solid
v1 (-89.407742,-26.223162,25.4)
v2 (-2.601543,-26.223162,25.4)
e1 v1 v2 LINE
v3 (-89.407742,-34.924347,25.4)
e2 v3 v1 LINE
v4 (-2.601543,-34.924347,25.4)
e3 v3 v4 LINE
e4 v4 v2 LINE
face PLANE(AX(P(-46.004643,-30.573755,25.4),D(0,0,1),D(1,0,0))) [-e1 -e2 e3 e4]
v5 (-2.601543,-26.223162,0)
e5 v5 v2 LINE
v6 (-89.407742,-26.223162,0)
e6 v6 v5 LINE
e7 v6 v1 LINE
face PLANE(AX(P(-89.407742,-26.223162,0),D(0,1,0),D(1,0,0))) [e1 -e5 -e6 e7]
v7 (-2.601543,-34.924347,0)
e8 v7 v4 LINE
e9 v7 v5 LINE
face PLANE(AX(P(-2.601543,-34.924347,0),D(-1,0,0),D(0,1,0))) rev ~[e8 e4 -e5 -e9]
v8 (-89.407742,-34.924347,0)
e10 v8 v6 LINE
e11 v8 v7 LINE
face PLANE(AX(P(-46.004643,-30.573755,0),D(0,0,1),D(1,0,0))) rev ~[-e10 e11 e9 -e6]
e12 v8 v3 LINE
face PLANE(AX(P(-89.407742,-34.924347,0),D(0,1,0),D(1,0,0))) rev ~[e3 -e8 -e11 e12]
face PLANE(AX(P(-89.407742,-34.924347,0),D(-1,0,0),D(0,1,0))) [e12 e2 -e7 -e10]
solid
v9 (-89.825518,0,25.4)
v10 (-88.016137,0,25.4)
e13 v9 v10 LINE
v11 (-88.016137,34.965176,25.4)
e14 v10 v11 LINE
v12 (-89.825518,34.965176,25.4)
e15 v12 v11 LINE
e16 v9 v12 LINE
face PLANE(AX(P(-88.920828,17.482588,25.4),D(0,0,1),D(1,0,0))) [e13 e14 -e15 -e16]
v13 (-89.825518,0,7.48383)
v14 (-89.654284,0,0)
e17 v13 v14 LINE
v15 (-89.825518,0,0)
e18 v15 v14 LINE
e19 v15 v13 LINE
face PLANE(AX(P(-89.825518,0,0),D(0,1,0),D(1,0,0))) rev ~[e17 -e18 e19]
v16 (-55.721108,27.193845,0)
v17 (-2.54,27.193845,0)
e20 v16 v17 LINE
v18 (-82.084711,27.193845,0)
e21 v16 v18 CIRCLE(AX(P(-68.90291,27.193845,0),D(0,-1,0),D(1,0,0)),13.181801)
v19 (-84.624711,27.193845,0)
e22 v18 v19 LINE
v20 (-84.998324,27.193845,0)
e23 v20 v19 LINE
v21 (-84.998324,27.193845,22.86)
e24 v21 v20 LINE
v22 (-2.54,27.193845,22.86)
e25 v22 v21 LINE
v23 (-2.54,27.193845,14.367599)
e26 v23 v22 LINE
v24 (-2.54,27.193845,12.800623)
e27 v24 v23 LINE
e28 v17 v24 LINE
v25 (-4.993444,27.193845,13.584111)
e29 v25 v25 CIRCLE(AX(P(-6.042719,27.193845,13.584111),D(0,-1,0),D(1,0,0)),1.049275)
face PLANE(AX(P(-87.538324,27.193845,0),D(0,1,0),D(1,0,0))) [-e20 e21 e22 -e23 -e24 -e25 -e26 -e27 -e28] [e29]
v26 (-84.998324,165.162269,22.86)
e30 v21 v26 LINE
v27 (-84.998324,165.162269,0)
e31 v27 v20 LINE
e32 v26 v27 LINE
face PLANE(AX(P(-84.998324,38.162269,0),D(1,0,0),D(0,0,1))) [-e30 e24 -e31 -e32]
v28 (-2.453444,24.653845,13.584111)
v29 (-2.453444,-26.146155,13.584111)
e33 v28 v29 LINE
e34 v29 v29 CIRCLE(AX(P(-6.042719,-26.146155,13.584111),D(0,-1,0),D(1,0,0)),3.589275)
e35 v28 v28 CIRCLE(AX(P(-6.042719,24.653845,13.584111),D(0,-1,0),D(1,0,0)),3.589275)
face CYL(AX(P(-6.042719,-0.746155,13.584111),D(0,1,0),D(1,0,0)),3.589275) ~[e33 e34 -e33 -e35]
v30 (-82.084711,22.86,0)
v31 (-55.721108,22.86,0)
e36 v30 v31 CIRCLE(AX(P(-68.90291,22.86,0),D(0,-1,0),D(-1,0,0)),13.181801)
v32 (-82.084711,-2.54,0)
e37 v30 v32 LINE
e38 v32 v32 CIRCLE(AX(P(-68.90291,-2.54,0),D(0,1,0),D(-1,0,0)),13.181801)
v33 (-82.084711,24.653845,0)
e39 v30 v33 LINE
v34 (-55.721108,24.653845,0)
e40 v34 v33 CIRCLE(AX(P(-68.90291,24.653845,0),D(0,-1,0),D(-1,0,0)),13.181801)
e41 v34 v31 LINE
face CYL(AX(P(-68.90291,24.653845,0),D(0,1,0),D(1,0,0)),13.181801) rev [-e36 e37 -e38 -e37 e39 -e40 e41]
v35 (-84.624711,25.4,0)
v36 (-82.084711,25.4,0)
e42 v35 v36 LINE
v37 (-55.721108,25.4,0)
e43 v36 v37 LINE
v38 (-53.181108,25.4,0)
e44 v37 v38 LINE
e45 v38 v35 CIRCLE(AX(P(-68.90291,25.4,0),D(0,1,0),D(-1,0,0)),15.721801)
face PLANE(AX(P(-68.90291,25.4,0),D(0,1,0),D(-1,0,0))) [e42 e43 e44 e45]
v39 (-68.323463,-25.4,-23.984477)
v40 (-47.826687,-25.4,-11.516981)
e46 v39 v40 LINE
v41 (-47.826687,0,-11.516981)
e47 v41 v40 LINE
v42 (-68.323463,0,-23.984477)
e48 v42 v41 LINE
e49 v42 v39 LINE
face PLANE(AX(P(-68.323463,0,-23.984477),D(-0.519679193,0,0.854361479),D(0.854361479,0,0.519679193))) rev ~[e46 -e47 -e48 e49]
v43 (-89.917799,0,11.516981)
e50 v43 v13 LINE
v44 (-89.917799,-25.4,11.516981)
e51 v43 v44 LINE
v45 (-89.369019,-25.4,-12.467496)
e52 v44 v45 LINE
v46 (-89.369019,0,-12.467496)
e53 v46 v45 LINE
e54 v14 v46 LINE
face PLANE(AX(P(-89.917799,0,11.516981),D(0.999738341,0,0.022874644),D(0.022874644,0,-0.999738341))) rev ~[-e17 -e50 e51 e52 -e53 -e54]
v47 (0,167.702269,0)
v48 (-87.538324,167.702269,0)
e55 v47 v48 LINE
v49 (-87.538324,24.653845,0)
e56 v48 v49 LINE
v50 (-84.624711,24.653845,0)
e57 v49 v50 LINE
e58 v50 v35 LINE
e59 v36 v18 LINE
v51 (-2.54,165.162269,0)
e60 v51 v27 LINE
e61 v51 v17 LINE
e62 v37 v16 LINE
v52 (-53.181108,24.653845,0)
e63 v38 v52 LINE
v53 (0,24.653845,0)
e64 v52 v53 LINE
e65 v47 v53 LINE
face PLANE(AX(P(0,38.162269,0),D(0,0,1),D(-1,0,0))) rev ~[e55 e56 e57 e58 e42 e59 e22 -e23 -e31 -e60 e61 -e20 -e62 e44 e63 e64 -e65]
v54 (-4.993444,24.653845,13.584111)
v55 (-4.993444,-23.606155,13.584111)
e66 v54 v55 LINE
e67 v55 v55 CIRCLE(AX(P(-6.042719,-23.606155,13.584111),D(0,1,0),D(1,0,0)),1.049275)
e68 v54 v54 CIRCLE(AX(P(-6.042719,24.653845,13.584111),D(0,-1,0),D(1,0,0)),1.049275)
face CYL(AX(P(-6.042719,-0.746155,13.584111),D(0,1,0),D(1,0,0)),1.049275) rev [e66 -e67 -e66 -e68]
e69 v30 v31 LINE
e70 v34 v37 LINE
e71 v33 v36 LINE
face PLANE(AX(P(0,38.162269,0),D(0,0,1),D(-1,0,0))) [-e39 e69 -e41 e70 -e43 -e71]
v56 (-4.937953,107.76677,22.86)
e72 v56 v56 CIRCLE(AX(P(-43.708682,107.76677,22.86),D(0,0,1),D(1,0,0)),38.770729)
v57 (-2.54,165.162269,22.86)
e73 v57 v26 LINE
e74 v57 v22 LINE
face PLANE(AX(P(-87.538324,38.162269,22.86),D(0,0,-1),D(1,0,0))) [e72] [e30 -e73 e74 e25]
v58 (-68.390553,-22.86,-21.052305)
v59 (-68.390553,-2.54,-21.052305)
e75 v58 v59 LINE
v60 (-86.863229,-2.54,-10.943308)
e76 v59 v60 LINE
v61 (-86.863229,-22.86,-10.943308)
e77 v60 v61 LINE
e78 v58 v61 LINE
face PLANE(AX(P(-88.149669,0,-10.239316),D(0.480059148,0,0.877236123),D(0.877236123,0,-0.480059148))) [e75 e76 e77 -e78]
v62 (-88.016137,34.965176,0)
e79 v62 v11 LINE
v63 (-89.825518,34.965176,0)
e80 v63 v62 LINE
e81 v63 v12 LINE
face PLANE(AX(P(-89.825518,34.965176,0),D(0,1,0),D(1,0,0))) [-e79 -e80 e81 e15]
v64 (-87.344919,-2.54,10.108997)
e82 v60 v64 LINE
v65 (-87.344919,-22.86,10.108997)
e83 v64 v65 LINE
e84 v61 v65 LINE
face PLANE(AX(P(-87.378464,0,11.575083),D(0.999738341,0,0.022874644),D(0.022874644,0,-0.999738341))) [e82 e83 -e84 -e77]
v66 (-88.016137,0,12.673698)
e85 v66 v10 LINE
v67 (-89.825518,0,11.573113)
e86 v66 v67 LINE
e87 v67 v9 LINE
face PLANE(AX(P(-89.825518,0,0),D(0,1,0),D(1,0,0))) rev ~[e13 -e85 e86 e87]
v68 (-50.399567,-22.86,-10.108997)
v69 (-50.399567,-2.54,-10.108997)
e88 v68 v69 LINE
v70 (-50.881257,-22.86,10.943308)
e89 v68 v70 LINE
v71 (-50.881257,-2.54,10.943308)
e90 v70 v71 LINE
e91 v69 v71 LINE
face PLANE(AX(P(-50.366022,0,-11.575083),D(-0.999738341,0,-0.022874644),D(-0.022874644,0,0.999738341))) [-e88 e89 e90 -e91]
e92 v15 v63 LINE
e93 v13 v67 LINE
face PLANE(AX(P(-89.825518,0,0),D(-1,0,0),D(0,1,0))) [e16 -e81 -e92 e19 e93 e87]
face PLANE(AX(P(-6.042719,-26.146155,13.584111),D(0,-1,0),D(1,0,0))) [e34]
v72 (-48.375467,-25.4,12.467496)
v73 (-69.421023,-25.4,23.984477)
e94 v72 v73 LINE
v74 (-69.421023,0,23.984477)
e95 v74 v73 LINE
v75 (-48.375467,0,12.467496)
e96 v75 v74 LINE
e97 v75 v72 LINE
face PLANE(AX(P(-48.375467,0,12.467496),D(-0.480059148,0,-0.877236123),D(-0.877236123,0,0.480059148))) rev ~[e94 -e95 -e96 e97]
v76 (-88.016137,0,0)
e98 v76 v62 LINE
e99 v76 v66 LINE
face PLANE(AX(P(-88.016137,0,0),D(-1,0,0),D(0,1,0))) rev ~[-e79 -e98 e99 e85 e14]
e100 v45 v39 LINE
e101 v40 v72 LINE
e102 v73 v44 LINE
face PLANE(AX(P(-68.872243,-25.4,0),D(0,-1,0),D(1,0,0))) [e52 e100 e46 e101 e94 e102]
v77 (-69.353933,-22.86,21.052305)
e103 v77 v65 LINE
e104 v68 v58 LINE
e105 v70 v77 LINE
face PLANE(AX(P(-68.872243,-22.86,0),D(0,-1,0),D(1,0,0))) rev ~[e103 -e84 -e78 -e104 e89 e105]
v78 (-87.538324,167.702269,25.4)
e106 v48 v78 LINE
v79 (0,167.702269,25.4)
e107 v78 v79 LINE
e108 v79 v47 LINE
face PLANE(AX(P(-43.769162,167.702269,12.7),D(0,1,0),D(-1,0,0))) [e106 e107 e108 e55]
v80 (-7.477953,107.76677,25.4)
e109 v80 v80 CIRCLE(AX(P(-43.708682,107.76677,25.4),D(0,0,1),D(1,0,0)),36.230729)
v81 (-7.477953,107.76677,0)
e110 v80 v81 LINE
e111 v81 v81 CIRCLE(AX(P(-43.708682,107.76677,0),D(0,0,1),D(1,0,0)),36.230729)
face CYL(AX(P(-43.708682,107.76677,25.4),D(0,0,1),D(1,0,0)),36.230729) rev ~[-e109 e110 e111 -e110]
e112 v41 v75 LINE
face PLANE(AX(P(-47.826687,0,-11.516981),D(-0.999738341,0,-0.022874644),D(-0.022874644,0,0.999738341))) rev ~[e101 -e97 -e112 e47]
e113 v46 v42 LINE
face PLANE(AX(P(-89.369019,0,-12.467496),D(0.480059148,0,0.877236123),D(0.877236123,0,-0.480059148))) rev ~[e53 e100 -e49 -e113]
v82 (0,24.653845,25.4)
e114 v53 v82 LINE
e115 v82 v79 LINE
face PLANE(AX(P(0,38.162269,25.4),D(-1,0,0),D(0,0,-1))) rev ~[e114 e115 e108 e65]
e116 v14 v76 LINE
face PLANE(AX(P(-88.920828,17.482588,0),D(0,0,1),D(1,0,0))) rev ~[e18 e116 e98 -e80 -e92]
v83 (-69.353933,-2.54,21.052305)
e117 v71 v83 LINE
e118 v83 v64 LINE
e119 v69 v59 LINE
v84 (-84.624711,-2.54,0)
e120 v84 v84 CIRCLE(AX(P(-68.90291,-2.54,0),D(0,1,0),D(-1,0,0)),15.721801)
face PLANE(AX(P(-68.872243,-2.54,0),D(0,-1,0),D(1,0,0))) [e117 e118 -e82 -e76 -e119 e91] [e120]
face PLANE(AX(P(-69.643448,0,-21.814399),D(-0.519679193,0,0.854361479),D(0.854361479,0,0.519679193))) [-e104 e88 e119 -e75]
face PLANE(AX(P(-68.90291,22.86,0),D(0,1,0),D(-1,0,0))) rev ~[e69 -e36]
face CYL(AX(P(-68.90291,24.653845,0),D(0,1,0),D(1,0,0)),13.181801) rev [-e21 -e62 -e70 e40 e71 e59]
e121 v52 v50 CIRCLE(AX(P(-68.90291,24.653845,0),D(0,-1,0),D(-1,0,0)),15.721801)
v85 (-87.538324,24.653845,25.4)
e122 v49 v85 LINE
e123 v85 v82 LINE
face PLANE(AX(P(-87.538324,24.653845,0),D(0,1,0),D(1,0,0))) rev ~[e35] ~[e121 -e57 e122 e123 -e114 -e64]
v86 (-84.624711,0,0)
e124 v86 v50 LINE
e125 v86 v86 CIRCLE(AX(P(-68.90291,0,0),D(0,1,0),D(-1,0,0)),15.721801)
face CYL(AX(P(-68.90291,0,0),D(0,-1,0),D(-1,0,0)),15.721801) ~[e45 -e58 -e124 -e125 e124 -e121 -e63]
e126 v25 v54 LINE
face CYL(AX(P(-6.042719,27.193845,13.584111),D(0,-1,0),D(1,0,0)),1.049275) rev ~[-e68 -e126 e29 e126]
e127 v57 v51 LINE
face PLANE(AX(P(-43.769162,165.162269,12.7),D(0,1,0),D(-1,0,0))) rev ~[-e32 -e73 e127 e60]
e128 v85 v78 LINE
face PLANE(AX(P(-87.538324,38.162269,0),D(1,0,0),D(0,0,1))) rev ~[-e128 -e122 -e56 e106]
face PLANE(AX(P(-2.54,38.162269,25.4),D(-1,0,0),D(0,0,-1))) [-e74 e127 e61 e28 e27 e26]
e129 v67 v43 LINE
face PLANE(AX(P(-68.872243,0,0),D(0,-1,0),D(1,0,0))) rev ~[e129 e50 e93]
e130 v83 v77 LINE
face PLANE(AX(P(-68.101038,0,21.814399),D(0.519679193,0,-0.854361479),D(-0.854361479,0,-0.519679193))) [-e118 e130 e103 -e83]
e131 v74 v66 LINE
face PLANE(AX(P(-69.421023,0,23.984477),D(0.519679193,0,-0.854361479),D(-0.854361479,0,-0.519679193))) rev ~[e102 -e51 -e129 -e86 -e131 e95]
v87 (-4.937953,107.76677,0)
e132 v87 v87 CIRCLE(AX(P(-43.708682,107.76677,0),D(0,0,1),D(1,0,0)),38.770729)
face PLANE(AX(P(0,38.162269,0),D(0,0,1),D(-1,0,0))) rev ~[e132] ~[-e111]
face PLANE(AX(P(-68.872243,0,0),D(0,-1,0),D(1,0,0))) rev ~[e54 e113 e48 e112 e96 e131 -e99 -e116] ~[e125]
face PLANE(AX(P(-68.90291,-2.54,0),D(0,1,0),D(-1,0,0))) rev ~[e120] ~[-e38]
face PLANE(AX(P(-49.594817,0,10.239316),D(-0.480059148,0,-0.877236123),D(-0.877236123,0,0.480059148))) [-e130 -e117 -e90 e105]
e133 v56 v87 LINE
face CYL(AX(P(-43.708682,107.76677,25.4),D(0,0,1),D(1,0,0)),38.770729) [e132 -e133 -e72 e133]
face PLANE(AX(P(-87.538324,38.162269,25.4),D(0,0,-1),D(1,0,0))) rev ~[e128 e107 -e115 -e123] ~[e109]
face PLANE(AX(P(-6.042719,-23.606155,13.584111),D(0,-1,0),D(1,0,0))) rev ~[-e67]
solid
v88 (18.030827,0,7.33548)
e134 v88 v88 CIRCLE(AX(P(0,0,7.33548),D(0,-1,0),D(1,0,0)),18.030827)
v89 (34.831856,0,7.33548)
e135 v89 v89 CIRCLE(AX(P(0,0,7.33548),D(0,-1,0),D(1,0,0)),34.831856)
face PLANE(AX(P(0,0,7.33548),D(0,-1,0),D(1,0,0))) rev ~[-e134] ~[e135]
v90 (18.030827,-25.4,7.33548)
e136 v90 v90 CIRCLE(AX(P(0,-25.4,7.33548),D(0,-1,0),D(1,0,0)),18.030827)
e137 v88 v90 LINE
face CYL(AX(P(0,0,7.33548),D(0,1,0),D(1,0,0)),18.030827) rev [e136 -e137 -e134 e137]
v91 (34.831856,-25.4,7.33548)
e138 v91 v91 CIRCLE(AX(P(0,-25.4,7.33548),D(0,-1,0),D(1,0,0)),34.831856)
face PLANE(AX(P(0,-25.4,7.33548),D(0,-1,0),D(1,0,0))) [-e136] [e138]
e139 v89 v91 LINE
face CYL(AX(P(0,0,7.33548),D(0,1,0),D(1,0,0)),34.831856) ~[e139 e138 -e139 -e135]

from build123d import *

# Parameters (mm, degrees)
F1_DEPTH     = 25.4
F2_R         = 25.8999671589
F2_R_2       = 17.2023355416
F3_DEPTH     = 25.4
F4_R         = 34.8318560705
F4_R_2       = 18.0308272553
F5_DEPTH     = 25.4
F6_R         = 14.9551436637
F7_DEPTH     = 25.4
F8_R         = 15.7218012702
F9_DEPTH     = 25.4
F10_W        = 87.5383242965
F10_H        = 13.5084241629
F11_DEPTH    = 25.4
F12_R        = 3.589274675
F13_DEPTH    = 25.4
F15_DEPTH    = 129.54
F16_DEPTH    = 25.4
F17_W        = 86.8061985821
F17_H        = 8.7011847645
F18_DEPTH    = 25.4
F19_R        = 36.2307294495
F20_DEPTH    = 25.4
F21_T        = 2.54
F21_T6_ANGLE = 180.000000001
F22_W        = 1.8093809485
F22_H        = 34.9651761353
F23_DEPTH    = 25.4


# Not quite as in the source:
# - a shell that OpenCascade refuses in one call is made with other operations: the cavity is built on its own and cut out


with BuildPart() as f1:
    # F0 (on Front) → F1 (new body)
    with BuildSketch(Plane.XZ):
        Polygon((-48.3754668356, 12.4674958523), (-69.4210231304, 23.9844769239), (-89.9177994608, 11.5169810717), (-89.3690194964, -12.4674958523), (-68.3234632015, -23.9844769239), (-47.8266868711, -11.5169810717), align=None)
    extrude(amount=F1_DEPTH)

    # F2 (on Front) → F3 (cut)
    with BuildSketch(Plane.XZ):
        Circle(F2_R)
        Circle(F2_R_2, mode=Mode.SUBTRACT)
        Circle(F2_R_2)
    extrude(amount=-F3_DEPTH, mode=Mode.SUBTRACT)

    # F6 (on Front) → F7 (join)
    with BuildSketch(Plane.XZ):
        with Locations((-68.4596300125, 0)):
            Circle(F6_R)
    extrude(amount=F7_DEPTH)

    # F8 (on face) → F9 (join)
    with BuildSketch(Plane(origin=(0, 0, 0), x_dir=(-1, 0, 0), z_dir=(0, 1, 0))):
        with Locations((68.9029097557, 0)):
            Circle(F8_R)
    extrude(amount=F9_DEPTH)

    # F10 (on Top) → F11 (join)
    with BuildSketch(Plane.XY):
        with Locations((-43.7691621482, 31.4080566168)):
            Rectangle(F10_W, F10_H)
    extrude(amount=F11_DEPTH)

    # F12 (on face) → F13 (join)
    with BuildSketch(Plane.XZ.offset(-24.6538445354)):
        with Locations((-6.0427188873, 13.5841108859)):
            Circle(F12_R)
    extrude(amount=F13_DEPTH)

    # F14 (on face) → F15 (join)
    with BuildSketch(Plane(origin=(0, 38.1622686982, 0), x_dir=(-1, 0, 0), z_dir=(0, 1, 0))):
        Polygon((49.9359071255, 0), (87.5383242965, 0), (87.5383242965, 25.4), (0, 25.4), (0, 0), align=None)
    extrude(amount=F15_DEPTH)

    # F16 (add): a face of the model
    f16_faces = [f1.faces().sort_by_distance(p)[0] for p in [
        (-6.0427188873, -0.7461554646, 13.5841108859),
    ]]
    extrude(f16_faces, amount=F16_DEPTH)

    # F19 (on face) → F20 (cut)
    with BuildSketch(Plane.XY.offset(25.4)):
        with Locations((-43.7086820602, 107.7667698264)):
            Circle(F19_R)
    extrude(amount=-F20_DEPTH, mode=Mode.SUBTRACT)

    # F21: shell of thickness 2.54, made by hand


with BuildPart() as f5:
    # F4 (on Front) → F5 (new body)
    with BuildSketch(Plane.XZ):
        with Locations((0, 7.3354803026)):
            Circle(F4_R)
        with Locations((0, 7.3354803026)):
            Circle(F4_R_2, mode=Mode.SUBTRACT)
    extrude(amount=F5_DEPTH)


with BuildPart() as f18:
    # F17 (on Top) → F18 (new body)
    with BuildSketch(Plane.XY):
        with Locations((-46.0046427324, -30.5737545714)):
            Rectangle(F17_W, F17_H)
    extrude(amount=F18_DEPTH)


with BuildPart() as f21_core1:
    # F21_t2: copy of F1
    add(f1.part)

    # the walls: a layer under each face that stays
    f21_faces = [f21_core1.faces().sort_by_distance(p)[0] for p in [
        (-58.898244983, -12.7, 18.2259863881),
        (-48.1010768534, -12.7, 0.4752573903),
        (-79.6694112956, -12.7, 17.7507289978),
        (-82.9026140292, 0, -15.9896512826),
        (-68.872243166, -25.4, 0),
        (-58.0750750363, -12.7, -17.7507289978),
        (-89.6434094786, -12.7, -0.4752573903),
        (-78.8462413489, -12.7, -18.2259863881),
        (-53.1811084855, 12.7, 0),
        (-68.9029097557, 25.4, -7.8609006351),
        (-43.7691621482, 24.6538445354, 12.7),
        (0, 96.1780566168, 12.7),
        (-43.7691621482, 167.7022686982, 12.7),
        (-87.5383242965, 96.1780566168, 12.7),
        (-79.9394115097, 107.7667698264, 12.7),
        (-72.9486035804, 48.4952485625, 25.4),
        (-9.6319935623, -0.7461554646, 13.5841108859),
        (-6.0427188873, -26.1461554646, 13.5841108859),
    ]]
    thicken(f21_faces, amount=-F21_T, mode=Mode.SUBTRACT)

    # F21_s3 → F21_t4 (revolve, cut)
    with BuildSketch(Plane.XY):
        Polygon((-84.6501110259, 0.0254), (-84.6247110259, -2.54), (-82.0847110259, -2.54), (-82.0847110259, 0), align=None)
    revolve(axis=Axis((-68.9029097557, 0, 0), (0, 1, 0)), mode=Mode.SUBTRACT)

    # F21_s5 → F21_t6 (revolve, cut)
    with BuildSketch(Plane.XY):
        Polygon((-53.1557084855, 24.6284445354), (-55.7211084855, 24.6538445354), (-55.7211084855, 27.1938445354), (-53.1811084855, 27.1938445354), align=None)
    revolve(axis=Axis((-68.9029097557, 24.6538445354, 0), (0, -1, 0)), revolution_arc=F21_T6_ANGLE, mode=Mode.SUBTRACT)

    # F21_s7 → F21_t8 (revolve, cut)
    with BuildSketch(Plane.XY.offset(13.5841108859)):
        Polygon((-2.4280442124, 24.6284445354), (-2.4534442124, 27.1938445354), (-4.9934442124, 27.1938445354), (-4.9934442124, 24.6538445354), align=None)
    revolve(axis=Axis((-6.0427188873, 24.6538445354, 13.5841108859), (0, -1, 0)), mode=Mode.SUBTRACT)


with BuildPart() as f1_1:
    add(f1.part)

    # what is left inside the walls is the cavity
    f21_cavity = [f21_core1.part.solids().sort_by_distance(p)[0] for p in [
        (-64.383743, 38.671363, 0.0254),
    ]]
    add(f21_cavity, mode=Mode.SUBTRACT)

    # F22 (on Top) → F23 (join)
    with BuildSketch(Plane.XY):
        with Locations((-88.920827955, 17.4825880677)):
            Rectangle(F22_W, F22_H)
    extrude(amount=F23_DEPTH)


solid = Compound([f5.part, f18.part, f1_1.part])
